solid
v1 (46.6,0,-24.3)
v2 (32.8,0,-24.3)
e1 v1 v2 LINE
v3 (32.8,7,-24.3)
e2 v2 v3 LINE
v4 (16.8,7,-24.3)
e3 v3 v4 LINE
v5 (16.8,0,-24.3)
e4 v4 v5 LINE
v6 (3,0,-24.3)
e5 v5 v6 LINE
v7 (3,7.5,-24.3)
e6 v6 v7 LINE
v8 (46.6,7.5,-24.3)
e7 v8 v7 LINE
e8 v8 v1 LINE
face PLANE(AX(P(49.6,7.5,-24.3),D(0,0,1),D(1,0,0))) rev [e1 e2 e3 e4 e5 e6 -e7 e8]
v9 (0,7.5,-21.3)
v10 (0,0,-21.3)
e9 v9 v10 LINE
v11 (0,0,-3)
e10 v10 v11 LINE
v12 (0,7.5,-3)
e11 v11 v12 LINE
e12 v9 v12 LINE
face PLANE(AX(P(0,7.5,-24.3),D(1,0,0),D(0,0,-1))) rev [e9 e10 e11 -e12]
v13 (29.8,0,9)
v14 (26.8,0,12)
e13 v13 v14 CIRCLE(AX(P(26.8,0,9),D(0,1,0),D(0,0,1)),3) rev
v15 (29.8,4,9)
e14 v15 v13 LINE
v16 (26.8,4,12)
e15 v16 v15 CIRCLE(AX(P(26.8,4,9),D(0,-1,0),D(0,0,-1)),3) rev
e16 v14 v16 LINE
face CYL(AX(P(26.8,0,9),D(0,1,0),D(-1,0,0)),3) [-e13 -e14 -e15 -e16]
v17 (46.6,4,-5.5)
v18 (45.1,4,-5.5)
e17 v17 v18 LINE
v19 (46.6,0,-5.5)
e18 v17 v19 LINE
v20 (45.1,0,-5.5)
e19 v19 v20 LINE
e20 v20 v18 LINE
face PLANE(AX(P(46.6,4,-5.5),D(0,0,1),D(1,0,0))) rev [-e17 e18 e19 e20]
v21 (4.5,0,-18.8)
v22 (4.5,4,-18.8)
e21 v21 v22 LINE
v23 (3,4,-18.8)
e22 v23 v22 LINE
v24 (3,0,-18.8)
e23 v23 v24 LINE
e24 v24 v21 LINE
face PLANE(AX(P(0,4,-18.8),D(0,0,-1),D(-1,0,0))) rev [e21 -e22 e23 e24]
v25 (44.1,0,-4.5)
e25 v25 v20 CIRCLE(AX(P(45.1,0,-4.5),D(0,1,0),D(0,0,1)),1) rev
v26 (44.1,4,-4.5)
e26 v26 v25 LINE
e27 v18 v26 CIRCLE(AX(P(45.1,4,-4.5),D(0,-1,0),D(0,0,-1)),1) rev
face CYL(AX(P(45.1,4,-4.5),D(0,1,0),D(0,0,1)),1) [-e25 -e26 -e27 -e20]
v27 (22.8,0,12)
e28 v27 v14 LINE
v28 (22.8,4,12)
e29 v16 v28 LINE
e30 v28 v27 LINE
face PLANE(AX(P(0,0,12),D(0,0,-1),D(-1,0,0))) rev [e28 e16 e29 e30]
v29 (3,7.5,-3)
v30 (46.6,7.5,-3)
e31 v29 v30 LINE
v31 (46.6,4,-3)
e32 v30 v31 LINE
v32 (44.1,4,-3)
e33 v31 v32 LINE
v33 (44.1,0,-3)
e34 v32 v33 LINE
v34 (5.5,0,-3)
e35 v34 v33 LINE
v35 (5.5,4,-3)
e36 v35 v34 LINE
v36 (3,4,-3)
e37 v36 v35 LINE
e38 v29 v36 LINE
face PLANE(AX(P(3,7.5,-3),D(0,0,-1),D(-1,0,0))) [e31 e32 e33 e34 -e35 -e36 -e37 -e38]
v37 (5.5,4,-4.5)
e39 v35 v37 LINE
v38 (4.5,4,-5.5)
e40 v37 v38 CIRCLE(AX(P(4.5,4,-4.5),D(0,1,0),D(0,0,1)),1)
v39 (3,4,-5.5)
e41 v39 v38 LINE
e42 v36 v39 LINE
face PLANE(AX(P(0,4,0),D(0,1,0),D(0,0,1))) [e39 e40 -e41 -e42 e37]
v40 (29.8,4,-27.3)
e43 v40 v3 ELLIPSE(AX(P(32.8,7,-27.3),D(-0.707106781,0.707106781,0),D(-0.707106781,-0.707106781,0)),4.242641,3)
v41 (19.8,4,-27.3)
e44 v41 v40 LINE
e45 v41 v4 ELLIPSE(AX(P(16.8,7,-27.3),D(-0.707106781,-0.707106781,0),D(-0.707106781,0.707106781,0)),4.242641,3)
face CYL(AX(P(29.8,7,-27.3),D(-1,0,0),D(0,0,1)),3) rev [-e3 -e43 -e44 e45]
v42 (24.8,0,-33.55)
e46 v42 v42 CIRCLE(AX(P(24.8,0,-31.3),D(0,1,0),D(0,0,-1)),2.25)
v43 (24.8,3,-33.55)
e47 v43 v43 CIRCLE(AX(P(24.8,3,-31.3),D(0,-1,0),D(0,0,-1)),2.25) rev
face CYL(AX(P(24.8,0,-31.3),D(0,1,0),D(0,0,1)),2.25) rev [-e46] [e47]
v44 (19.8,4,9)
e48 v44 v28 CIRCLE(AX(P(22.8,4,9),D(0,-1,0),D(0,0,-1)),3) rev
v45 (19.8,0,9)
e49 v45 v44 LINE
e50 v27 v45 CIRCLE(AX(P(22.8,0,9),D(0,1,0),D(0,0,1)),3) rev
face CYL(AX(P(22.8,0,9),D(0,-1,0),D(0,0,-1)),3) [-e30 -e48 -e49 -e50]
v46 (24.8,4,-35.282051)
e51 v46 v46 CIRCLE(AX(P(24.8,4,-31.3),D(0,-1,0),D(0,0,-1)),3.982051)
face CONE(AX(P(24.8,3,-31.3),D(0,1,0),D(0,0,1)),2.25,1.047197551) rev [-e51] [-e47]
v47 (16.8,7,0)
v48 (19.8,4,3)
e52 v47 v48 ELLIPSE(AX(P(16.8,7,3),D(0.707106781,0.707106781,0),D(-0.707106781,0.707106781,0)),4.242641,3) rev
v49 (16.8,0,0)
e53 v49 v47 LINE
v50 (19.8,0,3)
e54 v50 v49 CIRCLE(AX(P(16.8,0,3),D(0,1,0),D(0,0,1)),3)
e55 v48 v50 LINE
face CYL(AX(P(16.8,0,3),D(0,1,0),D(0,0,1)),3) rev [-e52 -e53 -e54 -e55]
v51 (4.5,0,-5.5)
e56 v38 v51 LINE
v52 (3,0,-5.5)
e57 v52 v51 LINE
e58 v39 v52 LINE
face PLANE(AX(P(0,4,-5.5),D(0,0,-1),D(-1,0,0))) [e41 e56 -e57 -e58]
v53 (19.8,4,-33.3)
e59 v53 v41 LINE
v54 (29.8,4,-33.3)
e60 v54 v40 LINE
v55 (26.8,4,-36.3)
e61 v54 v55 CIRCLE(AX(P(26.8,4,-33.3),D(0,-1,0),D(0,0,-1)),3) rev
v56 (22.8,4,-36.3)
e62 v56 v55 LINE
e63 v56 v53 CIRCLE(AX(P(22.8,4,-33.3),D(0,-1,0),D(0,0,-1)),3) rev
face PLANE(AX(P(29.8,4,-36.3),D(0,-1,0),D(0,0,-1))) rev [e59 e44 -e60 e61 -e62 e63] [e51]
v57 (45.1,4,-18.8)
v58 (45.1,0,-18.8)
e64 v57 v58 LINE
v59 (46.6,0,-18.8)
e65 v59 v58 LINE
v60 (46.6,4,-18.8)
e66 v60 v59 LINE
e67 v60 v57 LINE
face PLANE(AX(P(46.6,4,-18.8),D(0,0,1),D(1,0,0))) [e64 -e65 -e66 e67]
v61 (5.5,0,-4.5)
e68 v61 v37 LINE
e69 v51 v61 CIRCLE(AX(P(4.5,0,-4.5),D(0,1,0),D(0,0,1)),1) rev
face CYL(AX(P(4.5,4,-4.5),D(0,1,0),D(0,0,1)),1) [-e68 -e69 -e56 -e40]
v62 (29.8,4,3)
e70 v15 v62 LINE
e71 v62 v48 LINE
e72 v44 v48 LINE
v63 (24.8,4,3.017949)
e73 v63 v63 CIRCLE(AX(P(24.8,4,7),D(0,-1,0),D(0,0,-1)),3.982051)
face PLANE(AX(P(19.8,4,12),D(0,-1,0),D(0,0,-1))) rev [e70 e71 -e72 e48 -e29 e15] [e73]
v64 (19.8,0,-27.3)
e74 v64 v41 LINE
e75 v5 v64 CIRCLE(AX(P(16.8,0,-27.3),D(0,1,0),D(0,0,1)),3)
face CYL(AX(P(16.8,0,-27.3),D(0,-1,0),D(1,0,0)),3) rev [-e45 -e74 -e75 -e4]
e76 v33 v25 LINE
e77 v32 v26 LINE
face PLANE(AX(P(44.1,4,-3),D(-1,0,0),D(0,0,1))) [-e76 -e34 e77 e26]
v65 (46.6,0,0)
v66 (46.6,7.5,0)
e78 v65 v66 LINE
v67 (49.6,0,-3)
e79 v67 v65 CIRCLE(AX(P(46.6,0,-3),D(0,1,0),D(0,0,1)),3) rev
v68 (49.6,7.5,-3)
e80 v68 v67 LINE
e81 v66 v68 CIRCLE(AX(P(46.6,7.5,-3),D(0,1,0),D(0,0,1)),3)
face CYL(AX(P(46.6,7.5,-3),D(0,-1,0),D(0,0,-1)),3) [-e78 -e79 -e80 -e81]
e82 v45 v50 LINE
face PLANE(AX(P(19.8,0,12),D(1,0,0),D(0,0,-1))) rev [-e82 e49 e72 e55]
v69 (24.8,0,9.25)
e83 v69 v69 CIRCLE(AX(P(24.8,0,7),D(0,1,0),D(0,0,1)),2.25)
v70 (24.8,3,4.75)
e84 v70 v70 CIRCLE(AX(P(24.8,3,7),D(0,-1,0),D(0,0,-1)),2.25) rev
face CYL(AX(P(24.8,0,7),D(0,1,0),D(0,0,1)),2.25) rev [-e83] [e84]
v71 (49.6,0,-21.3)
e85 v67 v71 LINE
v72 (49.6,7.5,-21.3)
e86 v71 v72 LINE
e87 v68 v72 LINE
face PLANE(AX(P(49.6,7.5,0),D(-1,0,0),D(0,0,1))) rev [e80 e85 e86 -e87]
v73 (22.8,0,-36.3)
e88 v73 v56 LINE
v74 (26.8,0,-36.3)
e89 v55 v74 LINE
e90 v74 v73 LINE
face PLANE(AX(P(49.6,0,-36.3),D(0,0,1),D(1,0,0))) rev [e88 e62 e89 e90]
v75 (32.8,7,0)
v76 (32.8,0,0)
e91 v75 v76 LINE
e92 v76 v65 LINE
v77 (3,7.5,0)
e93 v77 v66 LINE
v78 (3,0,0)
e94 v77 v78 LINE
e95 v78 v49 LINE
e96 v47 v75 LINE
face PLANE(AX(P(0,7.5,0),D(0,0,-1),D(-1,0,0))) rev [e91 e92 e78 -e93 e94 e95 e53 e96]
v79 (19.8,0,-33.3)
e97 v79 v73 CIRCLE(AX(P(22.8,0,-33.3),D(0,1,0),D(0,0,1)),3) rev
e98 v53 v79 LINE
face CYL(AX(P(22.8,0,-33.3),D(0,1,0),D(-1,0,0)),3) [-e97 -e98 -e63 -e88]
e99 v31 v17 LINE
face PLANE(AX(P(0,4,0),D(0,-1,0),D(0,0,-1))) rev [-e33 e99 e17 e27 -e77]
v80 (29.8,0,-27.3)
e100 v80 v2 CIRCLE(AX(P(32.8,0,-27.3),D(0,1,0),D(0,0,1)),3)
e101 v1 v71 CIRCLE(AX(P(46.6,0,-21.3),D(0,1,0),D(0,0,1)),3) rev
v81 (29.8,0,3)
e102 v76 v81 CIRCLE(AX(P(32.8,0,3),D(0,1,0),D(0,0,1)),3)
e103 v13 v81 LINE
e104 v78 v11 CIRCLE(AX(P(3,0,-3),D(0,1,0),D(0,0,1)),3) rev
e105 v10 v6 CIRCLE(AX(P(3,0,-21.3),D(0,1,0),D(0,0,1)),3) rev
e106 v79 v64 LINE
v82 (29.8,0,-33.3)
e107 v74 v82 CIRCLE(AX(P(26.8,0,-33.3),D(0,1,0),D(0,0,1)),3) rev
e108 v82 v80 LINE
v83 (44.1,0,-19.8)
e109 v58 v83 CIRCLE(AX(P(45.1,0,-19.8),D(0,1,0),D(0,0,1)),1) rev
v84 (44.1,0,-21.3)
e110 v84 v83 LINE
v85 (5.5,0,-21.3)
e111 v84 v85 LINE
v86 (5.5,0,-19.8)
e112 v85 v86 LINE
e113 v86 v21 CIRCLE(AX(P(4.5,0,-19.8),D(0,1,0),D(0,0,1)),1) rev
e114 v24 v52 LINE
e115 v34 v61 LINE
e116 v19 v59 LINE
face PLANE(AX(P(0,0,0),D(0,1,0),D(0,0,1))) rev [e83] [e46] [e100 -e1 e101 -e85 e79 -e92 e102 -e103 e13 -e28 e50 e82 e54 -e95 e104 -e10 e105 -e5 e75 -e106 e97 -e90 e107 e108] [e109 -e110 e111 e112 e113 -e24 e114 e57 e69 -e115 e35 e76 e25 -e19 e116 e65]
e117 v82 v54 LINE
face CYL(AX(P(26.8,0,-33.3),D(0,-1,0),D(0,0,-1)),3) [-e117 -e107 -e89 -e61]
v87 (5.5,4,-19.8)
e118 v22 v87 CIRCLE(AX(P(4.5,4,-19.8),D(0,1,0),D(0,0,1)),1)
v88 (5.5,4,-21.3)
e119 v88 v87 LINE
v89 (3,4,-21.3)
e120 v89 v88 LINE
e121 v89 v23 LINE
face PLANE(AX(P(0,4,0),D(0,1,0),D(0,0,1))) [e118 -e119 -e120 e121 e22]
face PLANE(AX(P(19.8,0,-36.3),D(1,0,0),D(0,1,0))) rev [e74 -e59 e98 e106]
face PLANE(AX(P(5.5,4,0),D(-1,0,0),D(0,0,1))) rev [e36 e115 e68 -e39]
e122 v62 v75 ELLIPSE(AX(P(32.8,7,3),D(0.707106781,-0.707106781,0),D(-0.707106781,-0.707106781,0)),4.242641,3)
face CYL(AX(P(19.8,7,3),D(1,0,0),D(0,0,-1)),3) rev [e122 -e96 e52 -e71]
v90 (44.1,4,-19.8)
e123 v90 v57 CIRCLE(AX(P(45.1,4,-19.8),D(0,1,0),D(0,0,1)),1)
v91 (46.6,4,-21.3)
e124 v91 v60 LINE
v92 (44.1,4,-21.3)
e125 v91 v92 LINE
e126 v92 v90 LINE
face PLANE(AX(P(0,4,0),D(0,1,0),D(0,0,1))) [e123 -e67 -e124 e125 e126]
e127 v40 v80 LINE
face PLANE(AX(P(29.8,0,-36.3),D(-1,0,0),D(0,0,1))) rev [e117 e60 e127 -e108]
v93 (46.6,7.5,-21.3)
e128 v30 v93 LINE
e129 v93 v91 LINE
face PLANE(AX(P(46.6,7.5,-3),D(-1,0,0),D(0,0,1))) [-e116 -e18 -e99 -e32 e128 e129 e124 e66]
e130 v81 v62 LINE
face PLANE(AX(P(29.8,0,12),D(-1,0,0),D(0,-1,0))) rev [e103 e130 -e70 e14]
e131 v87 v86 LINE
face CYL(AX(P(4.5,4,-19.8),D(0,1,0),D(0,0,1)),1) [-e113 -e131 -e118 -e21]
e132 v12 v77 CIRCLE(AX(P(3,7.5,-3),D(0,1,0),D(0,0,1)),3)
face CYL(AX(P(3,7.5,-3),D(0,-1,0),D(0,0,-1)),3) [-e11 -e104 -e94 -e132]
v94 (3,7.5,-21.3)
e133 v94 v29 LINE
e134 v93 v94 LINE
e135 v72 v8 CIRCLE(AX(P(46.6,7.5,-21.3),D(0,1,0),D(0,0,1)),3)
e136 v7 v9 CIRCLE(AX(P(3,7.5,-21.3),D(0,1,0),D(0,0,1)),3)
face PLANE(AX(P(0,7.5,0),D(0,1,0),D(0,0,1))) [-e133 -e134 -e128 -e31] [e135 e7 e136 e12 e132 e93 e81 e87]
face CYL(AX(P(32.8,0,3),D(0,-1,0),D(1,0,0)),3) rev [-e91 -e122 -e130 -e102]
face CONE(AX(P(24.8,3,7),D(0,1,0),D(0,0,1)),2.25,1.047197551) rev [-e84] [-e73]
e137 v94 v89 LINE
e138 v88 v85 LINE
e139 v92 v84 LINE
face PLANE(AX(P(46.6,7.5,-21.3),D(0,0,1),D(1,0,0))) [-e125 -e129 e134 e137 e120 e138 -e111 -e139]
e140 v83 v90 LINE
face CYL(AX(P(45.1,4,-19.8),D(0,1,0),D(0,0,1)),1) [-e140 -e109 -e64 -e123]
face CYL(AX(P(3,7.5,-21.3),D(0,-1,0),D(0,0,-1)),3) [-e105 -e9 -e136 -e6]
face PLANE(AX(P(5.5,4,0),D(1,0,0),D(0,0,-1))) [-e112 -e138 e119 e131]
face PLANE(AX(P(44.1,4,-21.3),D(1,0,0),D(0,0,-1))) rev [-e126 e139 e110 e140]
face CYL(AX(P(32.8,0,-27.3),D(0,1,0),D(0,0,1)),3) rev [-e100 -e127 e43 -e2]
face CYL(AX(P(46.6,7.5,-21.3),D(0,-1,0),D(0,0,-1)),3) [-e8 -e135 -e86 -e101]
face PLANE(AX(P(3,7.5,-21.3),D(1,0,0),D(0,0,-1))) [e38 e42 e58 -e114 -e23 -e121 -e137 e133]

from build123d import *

# Parameters (mm, degrees)
SKETCH5_W             = 49.6
SKETCH5_H             = 24.3
SKETCH5_W_2           = 43.6
SKETCH5_H_2           = 18.3
BOSS_EXTRUDE3_DEPTH   = 7.5
FILLET1_R             = 3
SKETCH7_W             = 2.5
SKETCH7_H             = 2.5
BOSS_EXTRUDE5_DEPTH   = 4
SKETCH11_W            = 10
SKETCH11_H            = 4
BOSS_EXTRUDE6_DEPTH   = 12
FILLET3_R             = 3
SKETCH13_R            = 2.25
CUT_EXTRUDE1_DEPTH    = 56.377341937
CHAMFER2_SIZE         = 1
CHAMFER2_SIZE2        = 1.732050808
CIRPATTERN1_OUTLINE_R = 2.25
CIRPATTERN1_DEPTH     = 2.9999999
CIRPATTERN1_START     = 2.9999999
CIRPATTERN1_2_DEPTH   = 1.0000001
FILLET5_R             = 3
FILLET6_R             = 1


with BuildPart() as part:
    # Sketch5 → Boss-Extrude3 (new body)
    with BuildSketch(Plane(origin=(0, 0, 0), x_dir=(1, 0, 0), z_dir=(0, 1, 0))):
        with Locations((24.8, 12.15)):
            Rectangle(SKETCH5_W, SKETCH5_H)
        with Locations((24.8, 12.15)):
            Rectangle(SKETCH5_W_2, SKETCH5_H_2, mode=Mode.SUBTRACT)
    extrude(amount=BOSS_EXTRUDE3_DEPTH)

    # Fillet1
    fillet1_edges = [part.edges().sort_by_distance(p)[0] for p in [
        (49.6, 3.75, -24.3),
        (49.6, 3.75, 0),
        (0, 3.75, 0),
        (0, 3.75, -24.3),
    ]]
    fillet(fillet1_edges, radius=FILLET1_R)

    # Sketch7 → Boss-Extrude5 (add)
    with BuildSketch(Plane(origin=(0, 0, 0), x_dir=(1, 0, 0), z_dir=(0, 1, 0))):
        with Locations((45.35, 4.25)):
            Rectangle(SKETCH7_W, SKETCH7_H)
        with Locations((45.35, 20.05)):
            Rectangle(SKETCH7_W, SKETCH7_H)
        with Locations((4.25, 4.25)):
            Rectangle(SKETCH7_W, SKETCH7_H)
        with Locations((4.25, 20.05)):
            Rectangle(SKETCH7_W, SKETCH7_H)
    extrude(amount=BOSS_EXTRUDE5_DEPTH)

    # Sketch11 → Boss-Extrude6 (add)
    with BuildSketch(Plane.XY):
        with Locations((24.8, 2)):
            Rectangle(SKETCH11_W, SKETCH11_H)
    extrude(amount=BOSS_EXTRUDE6_DEPTH)

    # Fillet3
    fillet3_edges = [part.edges().sort_by_distance(p)[0] for p in [
        (19.8, 2, 0),
        (29.8, 2, 0),
        (24.8, 4, 0),
        (19.8, 2, 12),
        (29.8, 2, 12),
    ]]
    fillet(fillet3_edges, radius=FILLET3_R)

    # Sketch13 → Cut-Extrude1 (cut, through all)
    with BuildSketch(Plane(origin=(0, 4, 0), x_dir=(1, 0, 0), z_dir=(0, 1, 0))):
        with Locations(Location((24.8, -7, 0), (0, 0, 270))):
            Circle(SKETCH13_R)
    extrude(amount=-CUT_EXTRUDE1_DEPTH, mode=Mode.SUBTRACT)

    # Chamfer2
    chamfer2_edges = [part.edges().sort_by_distance(p)[0] for p in [
        (24.8, 4, 4.75),
    ]]
    chamfer2_side = [part.faces().sort_by_distance(p)[0] for p in [
        (24.8, 2, 4.75),
    ]]
    chamfer(chamfer2_edges, length=CHAMFER2_SIZE, length2=CHAMFER2_SIZE2, reference=chamfer2_side[0])

    # CirPattern1: read off the stored shape, not the designer's step
    # CirPattern1 outline → CirPattern1 (add)
    with BuildSketch(Plane(origin=(0, 0, 0), x_dir=(1, 0, 0), z_dir=(0, 1, 0))):
        with BuildLine():
            Line((19.8, 33.3), (19.8, 24.3))
            Line((19.8, 24.3), (29.8, 24.3))
            Line((29.8, 24.3), (29.8, 33.3))
            ThreePointArc((29.8, 33.3), (28.921320344, 35.421320344), (26.8, 36.3))
            Line((26.8, 36.3), (22.8, 36.3))
            ThreePointArc((22.8, 36.3), (20.678679656, 35.421320344), (19.8, 33.3))
        make_face()
        with Locations((24.8, 31.3)):
            Circle(CIRPATTERN1_OUTLINE_R, mode=Mode.SUBTRACT)
    extrude(amount=CIRPATTERN1_DEPTH)

    # CirPattern1 2 outline → CirPattern1 2 (add)
    with BuildSketch(Plane(origin=(0, 0, 0), x_dir=(1, 0, 0), z_dir=(0, 1, 0)).offset(CIRPATTERN1_START)):
        with BuildLine():
            Line((19.8, 33.3), (19.8, 24.3))
            Line((19.8, 24.3), (29.8, 24.3))
            Line((29.8, 24.3), (29.8, 33.3))
            ThreePointArc((29.8, 33.3), (28.921320344, 35.421320344), (26.8, 36.3))
            Line((26.8, 36.3), (22.8, 36.3))
            ThreePointArc((22.8, 36.3), (20.678679656, 35.421320344), (19.8, 33.3))
        make_face()
    extrude(amount=CIRPATTERN1_2_DEPTH)

    # CirPattern1 3 outline → CirPattern1 3 (revolve, cut)
    with BuildSketch(Plane(origin=(24.8, 0, -31.3), x_dir=(1, 0, 0), z_dir=(0, 0, 1))):
        Polygon((0, 2.9999999), (2.25, 2.9999999), (3.982050808, 4), (0, 4), align=None)
    revolve(axis=Axis((24.8, 0, -31.3), (0, 1, 0)), mode=Mode.SUBTRACT)

    # Fillet5
    fillet5_edges = [part.edges().sort_by_distance(p)[0] for p in [
        (29.8, 2, -24.3),
        (19.8, 2, -24.3),
        (24.8, 4, -24.3),
    ]]
    fillet(fillet5_edges, radius=FILLET5_R)

    # Fillet6
    fillet6_edges = [part.edges().sort_by_distance(p)[0] for p in [
        (5.5, 2, -18.8),
        (5.5, 2, -5.5),
        (44.1, 2, -5.5),
        (44.1, 2, -18.8),
    ]]
    fillet(fillet6_edges, radius=FILLET6_R)


solid = part.part
